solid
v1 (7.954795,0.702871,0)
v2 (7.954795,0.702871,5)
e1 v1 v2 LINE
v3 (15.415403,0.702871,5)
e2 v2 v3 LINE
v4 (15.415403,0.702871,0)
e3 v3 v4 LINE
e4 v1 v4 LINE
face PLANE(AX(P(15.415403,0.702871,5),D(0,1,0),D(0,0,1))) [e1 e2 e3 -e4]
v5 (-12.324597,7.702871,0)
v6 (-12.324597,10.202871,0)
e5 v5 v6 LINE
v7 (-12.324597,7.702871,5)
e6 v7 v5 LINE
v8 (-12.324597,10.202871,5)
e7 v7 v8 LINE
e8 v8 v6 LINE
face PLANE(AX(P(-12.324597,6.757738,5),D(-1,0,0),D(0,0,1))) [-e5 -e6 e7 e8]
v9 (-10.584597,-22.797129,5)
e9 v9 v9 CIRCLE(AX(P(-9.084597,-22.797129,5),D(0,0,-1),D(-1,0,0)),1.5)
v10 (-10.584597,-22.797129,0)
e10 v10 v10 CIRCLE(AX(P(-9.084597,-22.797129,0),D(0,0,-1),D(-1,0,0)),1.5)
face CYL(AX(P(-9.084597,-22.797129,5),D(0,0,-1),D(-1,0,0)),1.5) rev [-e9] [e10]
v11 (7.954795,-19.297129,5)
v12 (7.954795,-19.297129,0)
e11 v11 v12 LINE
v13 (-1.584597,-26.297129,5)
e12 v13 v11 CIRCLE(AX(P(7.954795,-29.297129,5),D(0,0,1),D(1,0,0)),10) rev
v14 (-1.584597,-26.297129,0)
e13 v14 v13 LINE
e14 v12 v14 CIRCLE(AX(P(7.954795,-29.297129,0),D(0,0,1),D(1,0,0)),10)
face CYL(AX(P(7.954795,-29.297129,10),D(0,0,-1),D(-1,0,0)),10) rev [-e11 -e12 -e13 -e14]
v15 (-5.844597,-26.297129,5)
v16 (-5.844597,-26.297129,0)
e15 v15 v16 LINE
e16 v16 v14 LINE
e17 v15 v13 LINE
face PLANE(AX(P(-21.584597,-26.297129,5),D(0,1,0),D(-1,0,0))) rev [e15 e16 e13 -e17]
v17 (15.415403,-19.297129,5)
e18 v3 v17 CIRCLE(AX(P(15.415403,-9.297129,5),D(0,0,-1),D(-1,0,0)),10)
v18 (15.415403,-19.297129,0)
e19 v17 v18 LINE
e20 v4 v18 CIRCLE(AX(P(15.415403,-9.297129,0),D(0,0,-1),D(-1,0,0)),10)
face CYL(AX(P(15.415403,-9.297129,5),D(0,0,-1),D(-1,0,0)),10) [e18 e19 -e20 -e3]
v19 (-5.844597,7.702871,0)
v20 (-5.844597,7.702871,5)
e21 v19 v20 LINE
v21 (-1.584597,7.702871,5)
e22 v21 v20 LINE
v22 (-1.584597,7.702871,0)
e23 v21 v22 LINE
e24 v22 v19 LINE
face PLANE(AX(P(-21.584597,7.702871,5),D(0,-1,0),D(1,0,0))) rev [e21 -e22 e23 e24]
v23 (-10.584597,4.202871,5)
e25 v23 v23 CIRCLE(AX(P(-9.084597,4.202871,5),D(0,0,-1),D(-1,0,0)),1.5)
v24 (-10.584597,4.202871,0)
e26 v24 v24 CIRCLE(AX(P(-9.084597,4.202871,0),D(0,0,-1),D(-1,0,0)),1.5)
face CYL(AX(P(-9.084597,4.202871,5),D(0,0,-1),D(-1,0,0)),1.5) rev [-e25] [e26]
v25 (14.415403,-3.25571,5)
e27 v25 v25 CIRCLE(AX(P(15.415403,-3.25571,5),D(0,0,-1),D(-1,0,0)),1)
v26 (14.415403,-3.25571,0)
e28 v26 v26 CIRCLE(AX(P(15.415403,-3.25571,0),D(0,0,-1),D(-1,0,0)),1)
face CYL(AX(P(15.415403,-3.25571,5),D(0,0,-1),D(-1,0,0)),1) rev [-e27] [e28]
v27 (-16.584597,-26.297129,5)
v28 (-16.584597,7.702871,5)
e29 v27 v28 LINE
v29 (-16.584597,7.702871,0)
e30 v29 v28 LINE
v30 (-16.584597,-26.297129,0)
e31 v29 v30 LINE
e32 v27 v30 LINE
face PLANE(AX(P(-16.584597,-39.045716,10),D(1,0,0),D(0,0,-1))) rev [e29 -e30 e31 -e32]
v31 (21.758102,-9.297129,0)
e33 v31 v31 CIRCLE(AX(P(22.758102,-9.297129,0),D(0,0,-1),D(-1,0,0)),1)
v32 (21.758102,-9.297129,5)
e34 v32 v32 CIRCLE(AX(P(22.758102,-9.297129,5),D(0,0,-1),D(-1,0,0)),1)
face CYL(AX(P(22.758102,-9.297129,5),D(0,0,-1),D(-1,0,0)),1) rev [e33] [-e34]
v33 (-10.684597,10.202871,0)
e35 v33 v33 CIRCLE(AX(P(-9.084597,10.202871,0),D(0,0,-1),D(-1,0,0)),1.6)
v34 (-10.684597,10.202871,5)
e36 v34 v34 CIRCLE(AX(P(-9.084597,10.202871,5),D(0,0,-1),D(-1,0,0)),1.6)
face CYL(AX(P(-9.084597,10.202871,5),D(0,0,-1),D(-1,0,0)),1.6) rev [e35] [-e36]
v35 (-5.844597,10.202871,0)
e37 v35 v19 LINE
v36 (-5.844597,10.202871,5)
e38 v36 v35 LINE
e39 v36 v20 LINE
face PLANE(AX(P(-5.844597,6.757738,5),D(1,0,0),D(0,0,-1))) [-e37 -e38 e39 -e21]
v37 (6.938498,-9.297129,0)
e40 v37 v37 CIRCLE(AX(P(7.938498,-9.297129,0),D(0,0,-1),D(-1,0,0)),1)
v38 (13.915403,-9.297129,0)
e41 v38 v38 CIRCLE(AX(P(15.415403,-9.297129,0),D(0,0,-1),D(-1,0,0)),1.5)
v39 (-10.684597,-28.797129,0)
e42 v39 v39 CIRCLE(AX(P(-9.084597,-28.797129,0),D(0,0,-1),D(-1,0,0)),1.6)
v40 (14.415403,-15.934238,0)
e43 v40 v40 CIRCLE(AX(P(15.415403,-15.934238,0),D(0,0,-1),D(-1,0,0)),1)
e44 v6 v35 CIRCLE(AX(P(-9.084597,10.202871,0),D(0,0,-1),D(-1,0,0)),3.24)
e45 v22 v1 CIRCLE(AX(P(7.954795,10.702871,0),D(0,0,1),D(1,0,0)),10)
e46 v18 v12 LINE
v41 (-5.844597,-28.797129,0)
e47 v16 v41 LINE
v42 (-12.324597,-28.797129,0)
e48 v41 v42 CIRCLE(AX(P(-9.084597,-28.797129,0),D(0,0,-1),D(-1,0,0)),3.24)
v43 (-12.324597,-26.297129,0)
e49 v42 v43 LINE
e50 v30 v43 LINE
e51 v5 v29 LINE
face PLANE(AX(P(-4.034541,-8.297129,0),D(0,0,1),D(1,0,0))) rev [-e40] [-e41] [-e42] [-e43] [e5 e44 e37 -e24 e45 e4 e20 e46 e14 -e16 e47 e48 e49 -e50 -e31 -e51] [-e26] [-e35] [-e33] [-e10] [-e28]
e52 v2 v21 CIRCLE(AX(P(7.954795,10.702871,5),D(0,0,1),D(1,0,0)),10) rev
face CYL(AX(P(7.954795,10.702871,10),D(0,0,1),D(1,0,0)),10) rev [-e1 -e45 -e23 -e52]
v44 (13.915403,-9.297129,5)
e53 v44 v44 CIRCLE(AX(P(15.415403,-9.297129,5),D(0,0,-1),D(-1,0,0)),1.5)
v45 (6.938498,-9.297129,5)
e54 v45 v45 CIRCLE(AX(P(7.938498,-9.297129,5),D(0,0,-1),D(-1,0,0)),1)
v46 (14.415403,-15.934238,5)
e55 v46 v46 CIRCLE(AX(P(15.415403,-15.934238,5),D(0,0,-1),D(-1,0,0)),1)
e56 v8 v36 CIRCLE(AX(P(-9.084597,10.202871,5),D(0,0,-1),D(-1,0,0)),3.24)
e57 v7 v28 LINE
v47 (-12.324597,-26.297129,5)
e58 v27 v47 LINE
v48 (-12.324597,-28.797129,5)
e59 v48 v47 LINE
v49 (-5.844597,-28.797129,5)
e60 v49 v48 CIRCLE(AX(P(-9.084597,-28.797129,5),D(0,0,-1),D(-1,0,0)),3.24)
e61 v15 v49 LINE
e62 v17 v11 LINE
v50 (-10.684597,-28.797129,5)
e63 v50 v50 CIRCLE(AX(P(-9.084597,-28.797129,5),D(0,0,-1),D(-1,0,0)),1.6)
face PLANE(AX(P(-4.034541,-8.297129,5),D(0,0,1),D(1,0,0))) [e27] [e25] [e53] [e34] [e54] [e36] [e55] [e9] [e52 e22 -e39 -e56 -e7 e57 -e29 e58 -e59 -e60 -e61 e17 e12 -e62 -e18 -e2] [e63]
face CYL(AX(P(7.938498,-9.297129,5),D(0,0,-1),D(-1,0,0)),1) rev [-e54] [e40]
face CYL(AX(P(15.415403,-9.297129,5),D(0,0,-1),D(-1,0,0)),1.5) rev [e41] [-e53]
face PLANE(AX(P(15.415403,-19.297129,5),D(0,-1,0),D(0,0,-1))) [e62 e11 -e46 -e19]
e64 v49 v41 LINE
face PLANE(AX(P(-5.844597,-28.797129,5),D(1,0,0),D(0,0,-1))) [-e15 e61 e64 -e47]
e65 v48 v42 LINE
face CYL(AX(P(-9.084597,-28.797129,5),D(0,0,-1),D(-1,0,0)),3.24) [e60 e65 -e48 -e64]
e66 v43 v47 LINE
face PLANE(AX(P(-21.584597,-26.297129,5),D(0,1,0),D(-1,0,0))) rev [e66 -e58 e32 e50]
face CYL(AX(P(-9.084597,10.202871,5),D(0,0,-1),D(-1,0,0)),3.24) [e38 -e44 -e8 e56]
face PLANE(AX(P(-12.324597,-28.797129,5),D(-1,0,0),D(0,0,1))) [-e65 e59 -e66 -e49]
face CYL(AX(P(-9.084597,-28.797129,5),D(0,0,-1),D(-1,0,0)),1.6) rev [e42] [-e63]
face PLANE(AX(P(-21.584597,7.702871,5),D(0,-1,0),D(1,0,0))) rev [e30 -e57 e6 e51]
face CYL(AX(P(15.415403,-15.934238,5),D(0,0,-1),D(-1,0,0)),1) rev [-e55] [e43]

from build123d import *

# Parameters (mm, degrees)
ESQUISSE1_R             = 1
ESQUISSE1_R_2           = 1.5
BOSS_EXTRU_1_DEPTH      = 5
ENL_V_MAT_EXTRU_1_DEPTH = 5
ESQUISSE3_W             = 20
ESQUISSE3_H             = 34
BOSS_EXTRU_2_DEPTH      = 5
ESQUISSE4_R             = 1.5
ESQUISSE4_W             = 9.798464728
ESQUISSE4_H             = 39.858161606
ENL_V_MAT_EXTRU_2_DEPTH = 5
ESQUISSE5_W             = 2.5
ESQUISSE5_H             = 34
BOSS_EXTRU_3_DEPTH      = 5
ESQUISSE6_R             = 1.6
BOSS_EXTRU_4_DEPTH      = 5
ESQUISSE8_W             = 43.131619687
ESQUISSE8_H             = 48.78573065
ESQUISSE8_W_2           = 13.204377845
ESQUISSE8_H_2           = 47.447309867
ENL_V_MAT_EXTRU_3_DEPTH = 10
ESQUISSE9_R             = 1.5
ESQUISSE9_R_2           = 1
BOSS_EXTRU_5_DEPTH      = 5
CONG_1_R                = 10


with BuildPart() as part:
    # Esquisse1 → Boss.-Extru.1 (new body)
    with BuildSketch(Plane.XY):
        with BuildLine():
            Line((-13.584596858, -30.047129187), (-13.584596858, -25.547129187))
            Line((-13.584596858, -25.547129187), (-13.584596858, -25.297129187))
            Line((-13.584596858, -25.297129187), (-13.834596858, -25.297129187))
            Line((-13.834596858, -25.297129187), (-16.334596858, -25.297129187))
            Line((-16.334596858, -25.297129187), (-16.584596858, -25.297129187))
            Line((-16.584596858, -25.297129187), (-16.584596858, -25.047129187))
            Line((-16.584596858, -25.047129187), (-16.584596858, 6.452870813))
            Line((-16.584596858, 6.452870813), (-16.584596858, 6.702870813))
            Line((-16.584596858, 6.702870813), (-16.334596858, 6.702870813))
            Line((-16.334596858, 6.702870813), (-13.834596858, 6.702870813))
            Line((-13.834596858, 6.702870813), (-13.584596858, 6.702870813))
            Line((-13.584596858, 6.702870813), (-13.584596858, 6.952870813))
            Line((-13.584596858, 6.952870813), (-13.584596858, 11.452870813))
            Line((-13.584596858, 11.452870813), (-13.584596858, 11.702870813))
            Line((-13.584596858, 11.702870813), (-13.334596858, 11.702870813))
            Line((-13.334596858, 11.702870813), (-8.584596858, 11.702870813))
            Line((-8.584596858, 11.702870813), (-8.584596858, 6.702870813))
            Line((-8.584596858, 6.702870813), (-7.491776281, 6.702870813))
            Line((-7.491776281, 6.702870813), (-4.034541178, 6.702870813))
            ThreePointArc((-4.034541178, 6.702870813), (-0.161557832, 6.19424756), (3.448773595, 4.702870813))
            ThreePointArc((3.448773595, 4.702870813), (10.66943645, 1.720117321), (18.415403142, 0.702870813))
            ThreePointArc((18.415403142, 0.702870813), (28.415403142, -9.297129187), (18.415403142, -19.297129187))
            ThreePointArc((18.415403142, -19.297129187), (10.66943645, -20.314375694), (3.448773595, -23.297129187))
            ThreePointArc((3.448773595, -23.297129187), (-0.161557832, -24.788505933), (-4.034541178, -25.297129187))
            Line((-4.034541178, -25.297129187), (-7.491776281, -25.297129187))
            Line((-7.491776281, -25.297129187), (-8.584596858, -25.297129187))
            Line((-8.584596858, -25.297129187), (-8.584596858, -30.297129187))
            Line((-8.584596858, -30.297129187), (-13.334596858, -30.297129187))
            Line((-13.334596858, -30.297129187), (-13.584596858, -30.297129187))
            Line((-13.584596858, -30.297129187), (-13.584596858, -30.047129187))
        make_face()
        with Locations((18.477857718, -2.297129187)):
            Circle(ESQUISSE1_R, mode=Mode.SUBTRACT)
        with Locations((25.415403142, -9.359583762)):
            Circle(ESQUISSE1_R, mode=Mode.SUBTRACT)
        with Locations((18.415403142, -9.297129187)):
            Circle(ESQUISSE1_R_2, mode=Mode.SUBTRACT)
        with Locations((11.415403142, -9.234674611)):
            Circle(ESQUISSE1_R, mode=Mode.SUBTRACT)
        with Locations((18.352948567, -16.297129187)):
            Circle(ESQUISSE1_R, mode=Mode.SUBTRACT)
    extrude(amount=BOSS_EXTRU_1_DEPTH)

    # Esquisse2 → Enlèv. mat.-Extru.1 (cut)
    with BuildSketch(Plane(origin=(0, 0, 0), x_dir=(-1, 0, 0), z_dir=(0, 0, -1))):
        Polygon((1.584596858, -19.297129187), (1.584596858, -25.297129187), (1.584596858, -26.297129187), (21.584596858, -26.297129187), (21.584596858, -33.65697819), (-26.833247513, -33.65697819), (-26.198667142, -19.297129187), align=None)
        Polygon((21.584596858, 7.702870813), (1.584596858, 7.702870813), (1.584596858, 6.702870813), (1.584596858, 0.702870813), (-26.198667142, 0.702870813), (-26.833247513, 15.062719816), (21.584596858, 15.062719816), align=None)
    extrude(amount=-ENL_V_MAT_EXTRU_1_DEPTH, mode=Mode.SUBTRACT)

    # Esquisse3 → Boss.-Extru.2 (add)
    with BuildSketch(Plane(origin=(0, 0, 0), x_dir=(-1, 0, 0), z_dir=(0, 0, -1))):
        with Locations((11.584596858, -9.297129187)):
            Rectangle(ESQUISSE3_W, ESQUISSE3_H)
    extrude(amount=-BOSS_EXTRU_2_DEPTH)

    # Esquisse4 → Enlèv. mat.-Extru.2 (cut)
    with BuildSketch(Plane(origin=(0, 0, 0), x_dir=(-1, 0, 0), z_dir=(0, 0, -1))):
        with Locations((9.084596858, -22.797129187)):
            Circle(ESQUISSE4_R)
        with Locations((9.084596858, 4.202870813)):
            Circle(ESQUISSE4_R)
        with Locations((23.983829222, -9.020336398)):
            Rectangle(ESQUISSE4_W, ESQUISSE4_H)
    extrude(amount=-ENL_V_MAT_EXTRU_2_DEPTH, mode=Mode.SUBTRACT)

    # Esquisse5 → Boss.-Extru.3 (add)
    with BuildSketch(Plane(origin=(0, 0, 0), x_dir=(-1, 0, 0), z_dir=(0, 0, -1))):
        with Locations((0.334596858, -9.297129187)):
            Rectangle(ESQUISSE5_W, ESQUISSE5_H)
    extrude(amount=-BOSS_EXTRU_3_DEPTH)

    # Esquisse6 → Boss.-Extru.4 (add)
    # profile 1 of 2: a face of its own
    with BuildSketch(Plane(origin=(0, 0, 0), x_dir=(-1, 0, 0), z_dir=(0, 0, -1))):
        with BuildLine():
            Line((12.324596858, -25.12480516), (5.844596858, -25.12480516))
            Line((5.844596858, -25.12480516), (5.844596858, -28.797129187))
            ThreePointArc((5.844596858, -28.797129187), (9.084596858, -32.037129187), (12.324596858, -28.797129187))
            Line((12.324596858, -28.797129187), (12.324596858, -25.12480516))
        make_face()
        with Locations((9.084596858, -28.797129187)):
            Circle(ESQUISSE6_R, mode=Mode.SUBTRACT)
    # profile 2 of 2: a face of its own
    with BuildSketch(Plane(origin=(0, 0, 0), x_dir=(-1, 0, 0), z_dir=(0, 0, -1))):
        with BuildLine():
            Line((12.324596858, 6.757738308), (5.844596858, 6.757738308))
            Line((5.844596858, 6.757738308), (5.844596858, 10.202870813))
            ThreePointArc((5.844596858, 10.202870813), (9.084596858, 13.442870813), (12.324596858, 10.202870813))
            Line((12.324596858, 10.202870813), (12.324596858, 6.757738308))
        make_face()
        with Locations((9.084596858, 10.202870813)):
            Circle(ESQUISSE6_R, mode=Mode.SUBTRACT)
    extrude(amount=-BOSS_EXTRU_4_DEPTH)

    # Esquisse8 → Enlèv. mat.-Extru.3 (cut)
    with BuildSketch(Plane(origin=(0, 0, 0), x_dir=(-1, 0, 0), z_dir=(0, 0, -1))):
        with Locations((-19.981212986, -14.067924119)):
            Rectangle(ESQUISSE8_W, ESQUISSE8_H)
        with Locations((23.186785781, -15.322061454)):
            Rectangle(ESQUISSE8_W_2, ESQUISSE8_H_2)
    extrude(amount=-ENL_V_MAT_EXTRU_3_DEPTH, mode=Mode.SUBTRACT)

    # Esquisse9 → Boss.-Extru.5 (add)
    with BuildSketch(Plane(origin=(0, 0, 0), x_dir=(-1, 0, 0), z_dir=(0, 0, -1))):
        with BuildLine():
            Line((-15.415403142, -19.297129187), (1.584596858, -19.297129187))
            Line((1.584596858, -19.297129187), (1.584596858, 0.702870813))
            Line((1.584596858, 0.702870813), (-15.415403142, 0.702870813))
            ThreePointArc((-15.415403142, 0.702870813), (-25.415403142, -9.297129187), (-15.415403142, -19.297129187))
        make_face()
        with Locations((-15.415403142, -9.297129187)):
            Circle(ESQUISSE9_R, mode=Mode.SUBTRACT)
        with Locations((-15.415403142, -15.934238111)):
            Circle(ESQUISSE9_R_2, mode=Mode.SUBTRACT)
        with Locations((-22.758101932, -9.297129187)):
            Circle(ESQUISSE9_R_2, mode=Mode.SUBTRACT)
        with Locations((-15.415403142, -3.255710211)):
            Circle(ESQUISSE9_R_2, mode=Mode.SUBTRACT)
        with Locations((-7.938498128, -9.297129187)):
            Circle(ESQUISSE9_R_2, mode=Mode.SUBTRACT)
    extrude(amount=-BOSS_EXTRU_5_DEPTH)

    # Congé1
    # the kernel refuses this fillet: 10 mm, written as the material it adds along each edge
    with BuildSketch(Plane(origin=(-1.584596858, 0.702870813, 0), x_dir=(0, 1, 0), z_dir=(0, 0, 1))) as cong_1_piece_1:
        with BuildLine():
            CenterArc((10, -9.539392014), CONG_1_R, 107.457603124, 72.542396876)
            Line((0, -9.539392014), (-0.2, -9.539392014))
            Line((-0.2, -9.539392014), (-0.2, 0))
            Line((-0.2, 0), (0, 0.2))
            ThreePointArc((0, 0.2), (3.5, 0.2), (6.94, 0.19078784))
            Line((6.94, 0.19078784), (7, 0))
        make_face()
    extrude(amount=5)
    with BuildSketch(Plane(origin=(-1.584596858, -19.297129187, 0), x_dir=(0, -1, 0), z_dir=(0, 0, 1))) as cong_1_piece_2:
        with BuildLine():
            CenterArc((10, 9.539392014), CONG_1_R, 180, 72.542396876)
            Line((0, 9.539392014), (-0.2, 9.539392014))
            Line((-0.2, 9.539392014), (-0.2, 0))
            Line((-0.2, 0), (0, -0.2))
            ThreePointArc((0, -0.2), (3.5, -0.2), (6.94, -0.19078784))
            Line((6.94, -0.19078784), (7, 0))
        make_face()
    extrude(amount=5)


solid = part.part
